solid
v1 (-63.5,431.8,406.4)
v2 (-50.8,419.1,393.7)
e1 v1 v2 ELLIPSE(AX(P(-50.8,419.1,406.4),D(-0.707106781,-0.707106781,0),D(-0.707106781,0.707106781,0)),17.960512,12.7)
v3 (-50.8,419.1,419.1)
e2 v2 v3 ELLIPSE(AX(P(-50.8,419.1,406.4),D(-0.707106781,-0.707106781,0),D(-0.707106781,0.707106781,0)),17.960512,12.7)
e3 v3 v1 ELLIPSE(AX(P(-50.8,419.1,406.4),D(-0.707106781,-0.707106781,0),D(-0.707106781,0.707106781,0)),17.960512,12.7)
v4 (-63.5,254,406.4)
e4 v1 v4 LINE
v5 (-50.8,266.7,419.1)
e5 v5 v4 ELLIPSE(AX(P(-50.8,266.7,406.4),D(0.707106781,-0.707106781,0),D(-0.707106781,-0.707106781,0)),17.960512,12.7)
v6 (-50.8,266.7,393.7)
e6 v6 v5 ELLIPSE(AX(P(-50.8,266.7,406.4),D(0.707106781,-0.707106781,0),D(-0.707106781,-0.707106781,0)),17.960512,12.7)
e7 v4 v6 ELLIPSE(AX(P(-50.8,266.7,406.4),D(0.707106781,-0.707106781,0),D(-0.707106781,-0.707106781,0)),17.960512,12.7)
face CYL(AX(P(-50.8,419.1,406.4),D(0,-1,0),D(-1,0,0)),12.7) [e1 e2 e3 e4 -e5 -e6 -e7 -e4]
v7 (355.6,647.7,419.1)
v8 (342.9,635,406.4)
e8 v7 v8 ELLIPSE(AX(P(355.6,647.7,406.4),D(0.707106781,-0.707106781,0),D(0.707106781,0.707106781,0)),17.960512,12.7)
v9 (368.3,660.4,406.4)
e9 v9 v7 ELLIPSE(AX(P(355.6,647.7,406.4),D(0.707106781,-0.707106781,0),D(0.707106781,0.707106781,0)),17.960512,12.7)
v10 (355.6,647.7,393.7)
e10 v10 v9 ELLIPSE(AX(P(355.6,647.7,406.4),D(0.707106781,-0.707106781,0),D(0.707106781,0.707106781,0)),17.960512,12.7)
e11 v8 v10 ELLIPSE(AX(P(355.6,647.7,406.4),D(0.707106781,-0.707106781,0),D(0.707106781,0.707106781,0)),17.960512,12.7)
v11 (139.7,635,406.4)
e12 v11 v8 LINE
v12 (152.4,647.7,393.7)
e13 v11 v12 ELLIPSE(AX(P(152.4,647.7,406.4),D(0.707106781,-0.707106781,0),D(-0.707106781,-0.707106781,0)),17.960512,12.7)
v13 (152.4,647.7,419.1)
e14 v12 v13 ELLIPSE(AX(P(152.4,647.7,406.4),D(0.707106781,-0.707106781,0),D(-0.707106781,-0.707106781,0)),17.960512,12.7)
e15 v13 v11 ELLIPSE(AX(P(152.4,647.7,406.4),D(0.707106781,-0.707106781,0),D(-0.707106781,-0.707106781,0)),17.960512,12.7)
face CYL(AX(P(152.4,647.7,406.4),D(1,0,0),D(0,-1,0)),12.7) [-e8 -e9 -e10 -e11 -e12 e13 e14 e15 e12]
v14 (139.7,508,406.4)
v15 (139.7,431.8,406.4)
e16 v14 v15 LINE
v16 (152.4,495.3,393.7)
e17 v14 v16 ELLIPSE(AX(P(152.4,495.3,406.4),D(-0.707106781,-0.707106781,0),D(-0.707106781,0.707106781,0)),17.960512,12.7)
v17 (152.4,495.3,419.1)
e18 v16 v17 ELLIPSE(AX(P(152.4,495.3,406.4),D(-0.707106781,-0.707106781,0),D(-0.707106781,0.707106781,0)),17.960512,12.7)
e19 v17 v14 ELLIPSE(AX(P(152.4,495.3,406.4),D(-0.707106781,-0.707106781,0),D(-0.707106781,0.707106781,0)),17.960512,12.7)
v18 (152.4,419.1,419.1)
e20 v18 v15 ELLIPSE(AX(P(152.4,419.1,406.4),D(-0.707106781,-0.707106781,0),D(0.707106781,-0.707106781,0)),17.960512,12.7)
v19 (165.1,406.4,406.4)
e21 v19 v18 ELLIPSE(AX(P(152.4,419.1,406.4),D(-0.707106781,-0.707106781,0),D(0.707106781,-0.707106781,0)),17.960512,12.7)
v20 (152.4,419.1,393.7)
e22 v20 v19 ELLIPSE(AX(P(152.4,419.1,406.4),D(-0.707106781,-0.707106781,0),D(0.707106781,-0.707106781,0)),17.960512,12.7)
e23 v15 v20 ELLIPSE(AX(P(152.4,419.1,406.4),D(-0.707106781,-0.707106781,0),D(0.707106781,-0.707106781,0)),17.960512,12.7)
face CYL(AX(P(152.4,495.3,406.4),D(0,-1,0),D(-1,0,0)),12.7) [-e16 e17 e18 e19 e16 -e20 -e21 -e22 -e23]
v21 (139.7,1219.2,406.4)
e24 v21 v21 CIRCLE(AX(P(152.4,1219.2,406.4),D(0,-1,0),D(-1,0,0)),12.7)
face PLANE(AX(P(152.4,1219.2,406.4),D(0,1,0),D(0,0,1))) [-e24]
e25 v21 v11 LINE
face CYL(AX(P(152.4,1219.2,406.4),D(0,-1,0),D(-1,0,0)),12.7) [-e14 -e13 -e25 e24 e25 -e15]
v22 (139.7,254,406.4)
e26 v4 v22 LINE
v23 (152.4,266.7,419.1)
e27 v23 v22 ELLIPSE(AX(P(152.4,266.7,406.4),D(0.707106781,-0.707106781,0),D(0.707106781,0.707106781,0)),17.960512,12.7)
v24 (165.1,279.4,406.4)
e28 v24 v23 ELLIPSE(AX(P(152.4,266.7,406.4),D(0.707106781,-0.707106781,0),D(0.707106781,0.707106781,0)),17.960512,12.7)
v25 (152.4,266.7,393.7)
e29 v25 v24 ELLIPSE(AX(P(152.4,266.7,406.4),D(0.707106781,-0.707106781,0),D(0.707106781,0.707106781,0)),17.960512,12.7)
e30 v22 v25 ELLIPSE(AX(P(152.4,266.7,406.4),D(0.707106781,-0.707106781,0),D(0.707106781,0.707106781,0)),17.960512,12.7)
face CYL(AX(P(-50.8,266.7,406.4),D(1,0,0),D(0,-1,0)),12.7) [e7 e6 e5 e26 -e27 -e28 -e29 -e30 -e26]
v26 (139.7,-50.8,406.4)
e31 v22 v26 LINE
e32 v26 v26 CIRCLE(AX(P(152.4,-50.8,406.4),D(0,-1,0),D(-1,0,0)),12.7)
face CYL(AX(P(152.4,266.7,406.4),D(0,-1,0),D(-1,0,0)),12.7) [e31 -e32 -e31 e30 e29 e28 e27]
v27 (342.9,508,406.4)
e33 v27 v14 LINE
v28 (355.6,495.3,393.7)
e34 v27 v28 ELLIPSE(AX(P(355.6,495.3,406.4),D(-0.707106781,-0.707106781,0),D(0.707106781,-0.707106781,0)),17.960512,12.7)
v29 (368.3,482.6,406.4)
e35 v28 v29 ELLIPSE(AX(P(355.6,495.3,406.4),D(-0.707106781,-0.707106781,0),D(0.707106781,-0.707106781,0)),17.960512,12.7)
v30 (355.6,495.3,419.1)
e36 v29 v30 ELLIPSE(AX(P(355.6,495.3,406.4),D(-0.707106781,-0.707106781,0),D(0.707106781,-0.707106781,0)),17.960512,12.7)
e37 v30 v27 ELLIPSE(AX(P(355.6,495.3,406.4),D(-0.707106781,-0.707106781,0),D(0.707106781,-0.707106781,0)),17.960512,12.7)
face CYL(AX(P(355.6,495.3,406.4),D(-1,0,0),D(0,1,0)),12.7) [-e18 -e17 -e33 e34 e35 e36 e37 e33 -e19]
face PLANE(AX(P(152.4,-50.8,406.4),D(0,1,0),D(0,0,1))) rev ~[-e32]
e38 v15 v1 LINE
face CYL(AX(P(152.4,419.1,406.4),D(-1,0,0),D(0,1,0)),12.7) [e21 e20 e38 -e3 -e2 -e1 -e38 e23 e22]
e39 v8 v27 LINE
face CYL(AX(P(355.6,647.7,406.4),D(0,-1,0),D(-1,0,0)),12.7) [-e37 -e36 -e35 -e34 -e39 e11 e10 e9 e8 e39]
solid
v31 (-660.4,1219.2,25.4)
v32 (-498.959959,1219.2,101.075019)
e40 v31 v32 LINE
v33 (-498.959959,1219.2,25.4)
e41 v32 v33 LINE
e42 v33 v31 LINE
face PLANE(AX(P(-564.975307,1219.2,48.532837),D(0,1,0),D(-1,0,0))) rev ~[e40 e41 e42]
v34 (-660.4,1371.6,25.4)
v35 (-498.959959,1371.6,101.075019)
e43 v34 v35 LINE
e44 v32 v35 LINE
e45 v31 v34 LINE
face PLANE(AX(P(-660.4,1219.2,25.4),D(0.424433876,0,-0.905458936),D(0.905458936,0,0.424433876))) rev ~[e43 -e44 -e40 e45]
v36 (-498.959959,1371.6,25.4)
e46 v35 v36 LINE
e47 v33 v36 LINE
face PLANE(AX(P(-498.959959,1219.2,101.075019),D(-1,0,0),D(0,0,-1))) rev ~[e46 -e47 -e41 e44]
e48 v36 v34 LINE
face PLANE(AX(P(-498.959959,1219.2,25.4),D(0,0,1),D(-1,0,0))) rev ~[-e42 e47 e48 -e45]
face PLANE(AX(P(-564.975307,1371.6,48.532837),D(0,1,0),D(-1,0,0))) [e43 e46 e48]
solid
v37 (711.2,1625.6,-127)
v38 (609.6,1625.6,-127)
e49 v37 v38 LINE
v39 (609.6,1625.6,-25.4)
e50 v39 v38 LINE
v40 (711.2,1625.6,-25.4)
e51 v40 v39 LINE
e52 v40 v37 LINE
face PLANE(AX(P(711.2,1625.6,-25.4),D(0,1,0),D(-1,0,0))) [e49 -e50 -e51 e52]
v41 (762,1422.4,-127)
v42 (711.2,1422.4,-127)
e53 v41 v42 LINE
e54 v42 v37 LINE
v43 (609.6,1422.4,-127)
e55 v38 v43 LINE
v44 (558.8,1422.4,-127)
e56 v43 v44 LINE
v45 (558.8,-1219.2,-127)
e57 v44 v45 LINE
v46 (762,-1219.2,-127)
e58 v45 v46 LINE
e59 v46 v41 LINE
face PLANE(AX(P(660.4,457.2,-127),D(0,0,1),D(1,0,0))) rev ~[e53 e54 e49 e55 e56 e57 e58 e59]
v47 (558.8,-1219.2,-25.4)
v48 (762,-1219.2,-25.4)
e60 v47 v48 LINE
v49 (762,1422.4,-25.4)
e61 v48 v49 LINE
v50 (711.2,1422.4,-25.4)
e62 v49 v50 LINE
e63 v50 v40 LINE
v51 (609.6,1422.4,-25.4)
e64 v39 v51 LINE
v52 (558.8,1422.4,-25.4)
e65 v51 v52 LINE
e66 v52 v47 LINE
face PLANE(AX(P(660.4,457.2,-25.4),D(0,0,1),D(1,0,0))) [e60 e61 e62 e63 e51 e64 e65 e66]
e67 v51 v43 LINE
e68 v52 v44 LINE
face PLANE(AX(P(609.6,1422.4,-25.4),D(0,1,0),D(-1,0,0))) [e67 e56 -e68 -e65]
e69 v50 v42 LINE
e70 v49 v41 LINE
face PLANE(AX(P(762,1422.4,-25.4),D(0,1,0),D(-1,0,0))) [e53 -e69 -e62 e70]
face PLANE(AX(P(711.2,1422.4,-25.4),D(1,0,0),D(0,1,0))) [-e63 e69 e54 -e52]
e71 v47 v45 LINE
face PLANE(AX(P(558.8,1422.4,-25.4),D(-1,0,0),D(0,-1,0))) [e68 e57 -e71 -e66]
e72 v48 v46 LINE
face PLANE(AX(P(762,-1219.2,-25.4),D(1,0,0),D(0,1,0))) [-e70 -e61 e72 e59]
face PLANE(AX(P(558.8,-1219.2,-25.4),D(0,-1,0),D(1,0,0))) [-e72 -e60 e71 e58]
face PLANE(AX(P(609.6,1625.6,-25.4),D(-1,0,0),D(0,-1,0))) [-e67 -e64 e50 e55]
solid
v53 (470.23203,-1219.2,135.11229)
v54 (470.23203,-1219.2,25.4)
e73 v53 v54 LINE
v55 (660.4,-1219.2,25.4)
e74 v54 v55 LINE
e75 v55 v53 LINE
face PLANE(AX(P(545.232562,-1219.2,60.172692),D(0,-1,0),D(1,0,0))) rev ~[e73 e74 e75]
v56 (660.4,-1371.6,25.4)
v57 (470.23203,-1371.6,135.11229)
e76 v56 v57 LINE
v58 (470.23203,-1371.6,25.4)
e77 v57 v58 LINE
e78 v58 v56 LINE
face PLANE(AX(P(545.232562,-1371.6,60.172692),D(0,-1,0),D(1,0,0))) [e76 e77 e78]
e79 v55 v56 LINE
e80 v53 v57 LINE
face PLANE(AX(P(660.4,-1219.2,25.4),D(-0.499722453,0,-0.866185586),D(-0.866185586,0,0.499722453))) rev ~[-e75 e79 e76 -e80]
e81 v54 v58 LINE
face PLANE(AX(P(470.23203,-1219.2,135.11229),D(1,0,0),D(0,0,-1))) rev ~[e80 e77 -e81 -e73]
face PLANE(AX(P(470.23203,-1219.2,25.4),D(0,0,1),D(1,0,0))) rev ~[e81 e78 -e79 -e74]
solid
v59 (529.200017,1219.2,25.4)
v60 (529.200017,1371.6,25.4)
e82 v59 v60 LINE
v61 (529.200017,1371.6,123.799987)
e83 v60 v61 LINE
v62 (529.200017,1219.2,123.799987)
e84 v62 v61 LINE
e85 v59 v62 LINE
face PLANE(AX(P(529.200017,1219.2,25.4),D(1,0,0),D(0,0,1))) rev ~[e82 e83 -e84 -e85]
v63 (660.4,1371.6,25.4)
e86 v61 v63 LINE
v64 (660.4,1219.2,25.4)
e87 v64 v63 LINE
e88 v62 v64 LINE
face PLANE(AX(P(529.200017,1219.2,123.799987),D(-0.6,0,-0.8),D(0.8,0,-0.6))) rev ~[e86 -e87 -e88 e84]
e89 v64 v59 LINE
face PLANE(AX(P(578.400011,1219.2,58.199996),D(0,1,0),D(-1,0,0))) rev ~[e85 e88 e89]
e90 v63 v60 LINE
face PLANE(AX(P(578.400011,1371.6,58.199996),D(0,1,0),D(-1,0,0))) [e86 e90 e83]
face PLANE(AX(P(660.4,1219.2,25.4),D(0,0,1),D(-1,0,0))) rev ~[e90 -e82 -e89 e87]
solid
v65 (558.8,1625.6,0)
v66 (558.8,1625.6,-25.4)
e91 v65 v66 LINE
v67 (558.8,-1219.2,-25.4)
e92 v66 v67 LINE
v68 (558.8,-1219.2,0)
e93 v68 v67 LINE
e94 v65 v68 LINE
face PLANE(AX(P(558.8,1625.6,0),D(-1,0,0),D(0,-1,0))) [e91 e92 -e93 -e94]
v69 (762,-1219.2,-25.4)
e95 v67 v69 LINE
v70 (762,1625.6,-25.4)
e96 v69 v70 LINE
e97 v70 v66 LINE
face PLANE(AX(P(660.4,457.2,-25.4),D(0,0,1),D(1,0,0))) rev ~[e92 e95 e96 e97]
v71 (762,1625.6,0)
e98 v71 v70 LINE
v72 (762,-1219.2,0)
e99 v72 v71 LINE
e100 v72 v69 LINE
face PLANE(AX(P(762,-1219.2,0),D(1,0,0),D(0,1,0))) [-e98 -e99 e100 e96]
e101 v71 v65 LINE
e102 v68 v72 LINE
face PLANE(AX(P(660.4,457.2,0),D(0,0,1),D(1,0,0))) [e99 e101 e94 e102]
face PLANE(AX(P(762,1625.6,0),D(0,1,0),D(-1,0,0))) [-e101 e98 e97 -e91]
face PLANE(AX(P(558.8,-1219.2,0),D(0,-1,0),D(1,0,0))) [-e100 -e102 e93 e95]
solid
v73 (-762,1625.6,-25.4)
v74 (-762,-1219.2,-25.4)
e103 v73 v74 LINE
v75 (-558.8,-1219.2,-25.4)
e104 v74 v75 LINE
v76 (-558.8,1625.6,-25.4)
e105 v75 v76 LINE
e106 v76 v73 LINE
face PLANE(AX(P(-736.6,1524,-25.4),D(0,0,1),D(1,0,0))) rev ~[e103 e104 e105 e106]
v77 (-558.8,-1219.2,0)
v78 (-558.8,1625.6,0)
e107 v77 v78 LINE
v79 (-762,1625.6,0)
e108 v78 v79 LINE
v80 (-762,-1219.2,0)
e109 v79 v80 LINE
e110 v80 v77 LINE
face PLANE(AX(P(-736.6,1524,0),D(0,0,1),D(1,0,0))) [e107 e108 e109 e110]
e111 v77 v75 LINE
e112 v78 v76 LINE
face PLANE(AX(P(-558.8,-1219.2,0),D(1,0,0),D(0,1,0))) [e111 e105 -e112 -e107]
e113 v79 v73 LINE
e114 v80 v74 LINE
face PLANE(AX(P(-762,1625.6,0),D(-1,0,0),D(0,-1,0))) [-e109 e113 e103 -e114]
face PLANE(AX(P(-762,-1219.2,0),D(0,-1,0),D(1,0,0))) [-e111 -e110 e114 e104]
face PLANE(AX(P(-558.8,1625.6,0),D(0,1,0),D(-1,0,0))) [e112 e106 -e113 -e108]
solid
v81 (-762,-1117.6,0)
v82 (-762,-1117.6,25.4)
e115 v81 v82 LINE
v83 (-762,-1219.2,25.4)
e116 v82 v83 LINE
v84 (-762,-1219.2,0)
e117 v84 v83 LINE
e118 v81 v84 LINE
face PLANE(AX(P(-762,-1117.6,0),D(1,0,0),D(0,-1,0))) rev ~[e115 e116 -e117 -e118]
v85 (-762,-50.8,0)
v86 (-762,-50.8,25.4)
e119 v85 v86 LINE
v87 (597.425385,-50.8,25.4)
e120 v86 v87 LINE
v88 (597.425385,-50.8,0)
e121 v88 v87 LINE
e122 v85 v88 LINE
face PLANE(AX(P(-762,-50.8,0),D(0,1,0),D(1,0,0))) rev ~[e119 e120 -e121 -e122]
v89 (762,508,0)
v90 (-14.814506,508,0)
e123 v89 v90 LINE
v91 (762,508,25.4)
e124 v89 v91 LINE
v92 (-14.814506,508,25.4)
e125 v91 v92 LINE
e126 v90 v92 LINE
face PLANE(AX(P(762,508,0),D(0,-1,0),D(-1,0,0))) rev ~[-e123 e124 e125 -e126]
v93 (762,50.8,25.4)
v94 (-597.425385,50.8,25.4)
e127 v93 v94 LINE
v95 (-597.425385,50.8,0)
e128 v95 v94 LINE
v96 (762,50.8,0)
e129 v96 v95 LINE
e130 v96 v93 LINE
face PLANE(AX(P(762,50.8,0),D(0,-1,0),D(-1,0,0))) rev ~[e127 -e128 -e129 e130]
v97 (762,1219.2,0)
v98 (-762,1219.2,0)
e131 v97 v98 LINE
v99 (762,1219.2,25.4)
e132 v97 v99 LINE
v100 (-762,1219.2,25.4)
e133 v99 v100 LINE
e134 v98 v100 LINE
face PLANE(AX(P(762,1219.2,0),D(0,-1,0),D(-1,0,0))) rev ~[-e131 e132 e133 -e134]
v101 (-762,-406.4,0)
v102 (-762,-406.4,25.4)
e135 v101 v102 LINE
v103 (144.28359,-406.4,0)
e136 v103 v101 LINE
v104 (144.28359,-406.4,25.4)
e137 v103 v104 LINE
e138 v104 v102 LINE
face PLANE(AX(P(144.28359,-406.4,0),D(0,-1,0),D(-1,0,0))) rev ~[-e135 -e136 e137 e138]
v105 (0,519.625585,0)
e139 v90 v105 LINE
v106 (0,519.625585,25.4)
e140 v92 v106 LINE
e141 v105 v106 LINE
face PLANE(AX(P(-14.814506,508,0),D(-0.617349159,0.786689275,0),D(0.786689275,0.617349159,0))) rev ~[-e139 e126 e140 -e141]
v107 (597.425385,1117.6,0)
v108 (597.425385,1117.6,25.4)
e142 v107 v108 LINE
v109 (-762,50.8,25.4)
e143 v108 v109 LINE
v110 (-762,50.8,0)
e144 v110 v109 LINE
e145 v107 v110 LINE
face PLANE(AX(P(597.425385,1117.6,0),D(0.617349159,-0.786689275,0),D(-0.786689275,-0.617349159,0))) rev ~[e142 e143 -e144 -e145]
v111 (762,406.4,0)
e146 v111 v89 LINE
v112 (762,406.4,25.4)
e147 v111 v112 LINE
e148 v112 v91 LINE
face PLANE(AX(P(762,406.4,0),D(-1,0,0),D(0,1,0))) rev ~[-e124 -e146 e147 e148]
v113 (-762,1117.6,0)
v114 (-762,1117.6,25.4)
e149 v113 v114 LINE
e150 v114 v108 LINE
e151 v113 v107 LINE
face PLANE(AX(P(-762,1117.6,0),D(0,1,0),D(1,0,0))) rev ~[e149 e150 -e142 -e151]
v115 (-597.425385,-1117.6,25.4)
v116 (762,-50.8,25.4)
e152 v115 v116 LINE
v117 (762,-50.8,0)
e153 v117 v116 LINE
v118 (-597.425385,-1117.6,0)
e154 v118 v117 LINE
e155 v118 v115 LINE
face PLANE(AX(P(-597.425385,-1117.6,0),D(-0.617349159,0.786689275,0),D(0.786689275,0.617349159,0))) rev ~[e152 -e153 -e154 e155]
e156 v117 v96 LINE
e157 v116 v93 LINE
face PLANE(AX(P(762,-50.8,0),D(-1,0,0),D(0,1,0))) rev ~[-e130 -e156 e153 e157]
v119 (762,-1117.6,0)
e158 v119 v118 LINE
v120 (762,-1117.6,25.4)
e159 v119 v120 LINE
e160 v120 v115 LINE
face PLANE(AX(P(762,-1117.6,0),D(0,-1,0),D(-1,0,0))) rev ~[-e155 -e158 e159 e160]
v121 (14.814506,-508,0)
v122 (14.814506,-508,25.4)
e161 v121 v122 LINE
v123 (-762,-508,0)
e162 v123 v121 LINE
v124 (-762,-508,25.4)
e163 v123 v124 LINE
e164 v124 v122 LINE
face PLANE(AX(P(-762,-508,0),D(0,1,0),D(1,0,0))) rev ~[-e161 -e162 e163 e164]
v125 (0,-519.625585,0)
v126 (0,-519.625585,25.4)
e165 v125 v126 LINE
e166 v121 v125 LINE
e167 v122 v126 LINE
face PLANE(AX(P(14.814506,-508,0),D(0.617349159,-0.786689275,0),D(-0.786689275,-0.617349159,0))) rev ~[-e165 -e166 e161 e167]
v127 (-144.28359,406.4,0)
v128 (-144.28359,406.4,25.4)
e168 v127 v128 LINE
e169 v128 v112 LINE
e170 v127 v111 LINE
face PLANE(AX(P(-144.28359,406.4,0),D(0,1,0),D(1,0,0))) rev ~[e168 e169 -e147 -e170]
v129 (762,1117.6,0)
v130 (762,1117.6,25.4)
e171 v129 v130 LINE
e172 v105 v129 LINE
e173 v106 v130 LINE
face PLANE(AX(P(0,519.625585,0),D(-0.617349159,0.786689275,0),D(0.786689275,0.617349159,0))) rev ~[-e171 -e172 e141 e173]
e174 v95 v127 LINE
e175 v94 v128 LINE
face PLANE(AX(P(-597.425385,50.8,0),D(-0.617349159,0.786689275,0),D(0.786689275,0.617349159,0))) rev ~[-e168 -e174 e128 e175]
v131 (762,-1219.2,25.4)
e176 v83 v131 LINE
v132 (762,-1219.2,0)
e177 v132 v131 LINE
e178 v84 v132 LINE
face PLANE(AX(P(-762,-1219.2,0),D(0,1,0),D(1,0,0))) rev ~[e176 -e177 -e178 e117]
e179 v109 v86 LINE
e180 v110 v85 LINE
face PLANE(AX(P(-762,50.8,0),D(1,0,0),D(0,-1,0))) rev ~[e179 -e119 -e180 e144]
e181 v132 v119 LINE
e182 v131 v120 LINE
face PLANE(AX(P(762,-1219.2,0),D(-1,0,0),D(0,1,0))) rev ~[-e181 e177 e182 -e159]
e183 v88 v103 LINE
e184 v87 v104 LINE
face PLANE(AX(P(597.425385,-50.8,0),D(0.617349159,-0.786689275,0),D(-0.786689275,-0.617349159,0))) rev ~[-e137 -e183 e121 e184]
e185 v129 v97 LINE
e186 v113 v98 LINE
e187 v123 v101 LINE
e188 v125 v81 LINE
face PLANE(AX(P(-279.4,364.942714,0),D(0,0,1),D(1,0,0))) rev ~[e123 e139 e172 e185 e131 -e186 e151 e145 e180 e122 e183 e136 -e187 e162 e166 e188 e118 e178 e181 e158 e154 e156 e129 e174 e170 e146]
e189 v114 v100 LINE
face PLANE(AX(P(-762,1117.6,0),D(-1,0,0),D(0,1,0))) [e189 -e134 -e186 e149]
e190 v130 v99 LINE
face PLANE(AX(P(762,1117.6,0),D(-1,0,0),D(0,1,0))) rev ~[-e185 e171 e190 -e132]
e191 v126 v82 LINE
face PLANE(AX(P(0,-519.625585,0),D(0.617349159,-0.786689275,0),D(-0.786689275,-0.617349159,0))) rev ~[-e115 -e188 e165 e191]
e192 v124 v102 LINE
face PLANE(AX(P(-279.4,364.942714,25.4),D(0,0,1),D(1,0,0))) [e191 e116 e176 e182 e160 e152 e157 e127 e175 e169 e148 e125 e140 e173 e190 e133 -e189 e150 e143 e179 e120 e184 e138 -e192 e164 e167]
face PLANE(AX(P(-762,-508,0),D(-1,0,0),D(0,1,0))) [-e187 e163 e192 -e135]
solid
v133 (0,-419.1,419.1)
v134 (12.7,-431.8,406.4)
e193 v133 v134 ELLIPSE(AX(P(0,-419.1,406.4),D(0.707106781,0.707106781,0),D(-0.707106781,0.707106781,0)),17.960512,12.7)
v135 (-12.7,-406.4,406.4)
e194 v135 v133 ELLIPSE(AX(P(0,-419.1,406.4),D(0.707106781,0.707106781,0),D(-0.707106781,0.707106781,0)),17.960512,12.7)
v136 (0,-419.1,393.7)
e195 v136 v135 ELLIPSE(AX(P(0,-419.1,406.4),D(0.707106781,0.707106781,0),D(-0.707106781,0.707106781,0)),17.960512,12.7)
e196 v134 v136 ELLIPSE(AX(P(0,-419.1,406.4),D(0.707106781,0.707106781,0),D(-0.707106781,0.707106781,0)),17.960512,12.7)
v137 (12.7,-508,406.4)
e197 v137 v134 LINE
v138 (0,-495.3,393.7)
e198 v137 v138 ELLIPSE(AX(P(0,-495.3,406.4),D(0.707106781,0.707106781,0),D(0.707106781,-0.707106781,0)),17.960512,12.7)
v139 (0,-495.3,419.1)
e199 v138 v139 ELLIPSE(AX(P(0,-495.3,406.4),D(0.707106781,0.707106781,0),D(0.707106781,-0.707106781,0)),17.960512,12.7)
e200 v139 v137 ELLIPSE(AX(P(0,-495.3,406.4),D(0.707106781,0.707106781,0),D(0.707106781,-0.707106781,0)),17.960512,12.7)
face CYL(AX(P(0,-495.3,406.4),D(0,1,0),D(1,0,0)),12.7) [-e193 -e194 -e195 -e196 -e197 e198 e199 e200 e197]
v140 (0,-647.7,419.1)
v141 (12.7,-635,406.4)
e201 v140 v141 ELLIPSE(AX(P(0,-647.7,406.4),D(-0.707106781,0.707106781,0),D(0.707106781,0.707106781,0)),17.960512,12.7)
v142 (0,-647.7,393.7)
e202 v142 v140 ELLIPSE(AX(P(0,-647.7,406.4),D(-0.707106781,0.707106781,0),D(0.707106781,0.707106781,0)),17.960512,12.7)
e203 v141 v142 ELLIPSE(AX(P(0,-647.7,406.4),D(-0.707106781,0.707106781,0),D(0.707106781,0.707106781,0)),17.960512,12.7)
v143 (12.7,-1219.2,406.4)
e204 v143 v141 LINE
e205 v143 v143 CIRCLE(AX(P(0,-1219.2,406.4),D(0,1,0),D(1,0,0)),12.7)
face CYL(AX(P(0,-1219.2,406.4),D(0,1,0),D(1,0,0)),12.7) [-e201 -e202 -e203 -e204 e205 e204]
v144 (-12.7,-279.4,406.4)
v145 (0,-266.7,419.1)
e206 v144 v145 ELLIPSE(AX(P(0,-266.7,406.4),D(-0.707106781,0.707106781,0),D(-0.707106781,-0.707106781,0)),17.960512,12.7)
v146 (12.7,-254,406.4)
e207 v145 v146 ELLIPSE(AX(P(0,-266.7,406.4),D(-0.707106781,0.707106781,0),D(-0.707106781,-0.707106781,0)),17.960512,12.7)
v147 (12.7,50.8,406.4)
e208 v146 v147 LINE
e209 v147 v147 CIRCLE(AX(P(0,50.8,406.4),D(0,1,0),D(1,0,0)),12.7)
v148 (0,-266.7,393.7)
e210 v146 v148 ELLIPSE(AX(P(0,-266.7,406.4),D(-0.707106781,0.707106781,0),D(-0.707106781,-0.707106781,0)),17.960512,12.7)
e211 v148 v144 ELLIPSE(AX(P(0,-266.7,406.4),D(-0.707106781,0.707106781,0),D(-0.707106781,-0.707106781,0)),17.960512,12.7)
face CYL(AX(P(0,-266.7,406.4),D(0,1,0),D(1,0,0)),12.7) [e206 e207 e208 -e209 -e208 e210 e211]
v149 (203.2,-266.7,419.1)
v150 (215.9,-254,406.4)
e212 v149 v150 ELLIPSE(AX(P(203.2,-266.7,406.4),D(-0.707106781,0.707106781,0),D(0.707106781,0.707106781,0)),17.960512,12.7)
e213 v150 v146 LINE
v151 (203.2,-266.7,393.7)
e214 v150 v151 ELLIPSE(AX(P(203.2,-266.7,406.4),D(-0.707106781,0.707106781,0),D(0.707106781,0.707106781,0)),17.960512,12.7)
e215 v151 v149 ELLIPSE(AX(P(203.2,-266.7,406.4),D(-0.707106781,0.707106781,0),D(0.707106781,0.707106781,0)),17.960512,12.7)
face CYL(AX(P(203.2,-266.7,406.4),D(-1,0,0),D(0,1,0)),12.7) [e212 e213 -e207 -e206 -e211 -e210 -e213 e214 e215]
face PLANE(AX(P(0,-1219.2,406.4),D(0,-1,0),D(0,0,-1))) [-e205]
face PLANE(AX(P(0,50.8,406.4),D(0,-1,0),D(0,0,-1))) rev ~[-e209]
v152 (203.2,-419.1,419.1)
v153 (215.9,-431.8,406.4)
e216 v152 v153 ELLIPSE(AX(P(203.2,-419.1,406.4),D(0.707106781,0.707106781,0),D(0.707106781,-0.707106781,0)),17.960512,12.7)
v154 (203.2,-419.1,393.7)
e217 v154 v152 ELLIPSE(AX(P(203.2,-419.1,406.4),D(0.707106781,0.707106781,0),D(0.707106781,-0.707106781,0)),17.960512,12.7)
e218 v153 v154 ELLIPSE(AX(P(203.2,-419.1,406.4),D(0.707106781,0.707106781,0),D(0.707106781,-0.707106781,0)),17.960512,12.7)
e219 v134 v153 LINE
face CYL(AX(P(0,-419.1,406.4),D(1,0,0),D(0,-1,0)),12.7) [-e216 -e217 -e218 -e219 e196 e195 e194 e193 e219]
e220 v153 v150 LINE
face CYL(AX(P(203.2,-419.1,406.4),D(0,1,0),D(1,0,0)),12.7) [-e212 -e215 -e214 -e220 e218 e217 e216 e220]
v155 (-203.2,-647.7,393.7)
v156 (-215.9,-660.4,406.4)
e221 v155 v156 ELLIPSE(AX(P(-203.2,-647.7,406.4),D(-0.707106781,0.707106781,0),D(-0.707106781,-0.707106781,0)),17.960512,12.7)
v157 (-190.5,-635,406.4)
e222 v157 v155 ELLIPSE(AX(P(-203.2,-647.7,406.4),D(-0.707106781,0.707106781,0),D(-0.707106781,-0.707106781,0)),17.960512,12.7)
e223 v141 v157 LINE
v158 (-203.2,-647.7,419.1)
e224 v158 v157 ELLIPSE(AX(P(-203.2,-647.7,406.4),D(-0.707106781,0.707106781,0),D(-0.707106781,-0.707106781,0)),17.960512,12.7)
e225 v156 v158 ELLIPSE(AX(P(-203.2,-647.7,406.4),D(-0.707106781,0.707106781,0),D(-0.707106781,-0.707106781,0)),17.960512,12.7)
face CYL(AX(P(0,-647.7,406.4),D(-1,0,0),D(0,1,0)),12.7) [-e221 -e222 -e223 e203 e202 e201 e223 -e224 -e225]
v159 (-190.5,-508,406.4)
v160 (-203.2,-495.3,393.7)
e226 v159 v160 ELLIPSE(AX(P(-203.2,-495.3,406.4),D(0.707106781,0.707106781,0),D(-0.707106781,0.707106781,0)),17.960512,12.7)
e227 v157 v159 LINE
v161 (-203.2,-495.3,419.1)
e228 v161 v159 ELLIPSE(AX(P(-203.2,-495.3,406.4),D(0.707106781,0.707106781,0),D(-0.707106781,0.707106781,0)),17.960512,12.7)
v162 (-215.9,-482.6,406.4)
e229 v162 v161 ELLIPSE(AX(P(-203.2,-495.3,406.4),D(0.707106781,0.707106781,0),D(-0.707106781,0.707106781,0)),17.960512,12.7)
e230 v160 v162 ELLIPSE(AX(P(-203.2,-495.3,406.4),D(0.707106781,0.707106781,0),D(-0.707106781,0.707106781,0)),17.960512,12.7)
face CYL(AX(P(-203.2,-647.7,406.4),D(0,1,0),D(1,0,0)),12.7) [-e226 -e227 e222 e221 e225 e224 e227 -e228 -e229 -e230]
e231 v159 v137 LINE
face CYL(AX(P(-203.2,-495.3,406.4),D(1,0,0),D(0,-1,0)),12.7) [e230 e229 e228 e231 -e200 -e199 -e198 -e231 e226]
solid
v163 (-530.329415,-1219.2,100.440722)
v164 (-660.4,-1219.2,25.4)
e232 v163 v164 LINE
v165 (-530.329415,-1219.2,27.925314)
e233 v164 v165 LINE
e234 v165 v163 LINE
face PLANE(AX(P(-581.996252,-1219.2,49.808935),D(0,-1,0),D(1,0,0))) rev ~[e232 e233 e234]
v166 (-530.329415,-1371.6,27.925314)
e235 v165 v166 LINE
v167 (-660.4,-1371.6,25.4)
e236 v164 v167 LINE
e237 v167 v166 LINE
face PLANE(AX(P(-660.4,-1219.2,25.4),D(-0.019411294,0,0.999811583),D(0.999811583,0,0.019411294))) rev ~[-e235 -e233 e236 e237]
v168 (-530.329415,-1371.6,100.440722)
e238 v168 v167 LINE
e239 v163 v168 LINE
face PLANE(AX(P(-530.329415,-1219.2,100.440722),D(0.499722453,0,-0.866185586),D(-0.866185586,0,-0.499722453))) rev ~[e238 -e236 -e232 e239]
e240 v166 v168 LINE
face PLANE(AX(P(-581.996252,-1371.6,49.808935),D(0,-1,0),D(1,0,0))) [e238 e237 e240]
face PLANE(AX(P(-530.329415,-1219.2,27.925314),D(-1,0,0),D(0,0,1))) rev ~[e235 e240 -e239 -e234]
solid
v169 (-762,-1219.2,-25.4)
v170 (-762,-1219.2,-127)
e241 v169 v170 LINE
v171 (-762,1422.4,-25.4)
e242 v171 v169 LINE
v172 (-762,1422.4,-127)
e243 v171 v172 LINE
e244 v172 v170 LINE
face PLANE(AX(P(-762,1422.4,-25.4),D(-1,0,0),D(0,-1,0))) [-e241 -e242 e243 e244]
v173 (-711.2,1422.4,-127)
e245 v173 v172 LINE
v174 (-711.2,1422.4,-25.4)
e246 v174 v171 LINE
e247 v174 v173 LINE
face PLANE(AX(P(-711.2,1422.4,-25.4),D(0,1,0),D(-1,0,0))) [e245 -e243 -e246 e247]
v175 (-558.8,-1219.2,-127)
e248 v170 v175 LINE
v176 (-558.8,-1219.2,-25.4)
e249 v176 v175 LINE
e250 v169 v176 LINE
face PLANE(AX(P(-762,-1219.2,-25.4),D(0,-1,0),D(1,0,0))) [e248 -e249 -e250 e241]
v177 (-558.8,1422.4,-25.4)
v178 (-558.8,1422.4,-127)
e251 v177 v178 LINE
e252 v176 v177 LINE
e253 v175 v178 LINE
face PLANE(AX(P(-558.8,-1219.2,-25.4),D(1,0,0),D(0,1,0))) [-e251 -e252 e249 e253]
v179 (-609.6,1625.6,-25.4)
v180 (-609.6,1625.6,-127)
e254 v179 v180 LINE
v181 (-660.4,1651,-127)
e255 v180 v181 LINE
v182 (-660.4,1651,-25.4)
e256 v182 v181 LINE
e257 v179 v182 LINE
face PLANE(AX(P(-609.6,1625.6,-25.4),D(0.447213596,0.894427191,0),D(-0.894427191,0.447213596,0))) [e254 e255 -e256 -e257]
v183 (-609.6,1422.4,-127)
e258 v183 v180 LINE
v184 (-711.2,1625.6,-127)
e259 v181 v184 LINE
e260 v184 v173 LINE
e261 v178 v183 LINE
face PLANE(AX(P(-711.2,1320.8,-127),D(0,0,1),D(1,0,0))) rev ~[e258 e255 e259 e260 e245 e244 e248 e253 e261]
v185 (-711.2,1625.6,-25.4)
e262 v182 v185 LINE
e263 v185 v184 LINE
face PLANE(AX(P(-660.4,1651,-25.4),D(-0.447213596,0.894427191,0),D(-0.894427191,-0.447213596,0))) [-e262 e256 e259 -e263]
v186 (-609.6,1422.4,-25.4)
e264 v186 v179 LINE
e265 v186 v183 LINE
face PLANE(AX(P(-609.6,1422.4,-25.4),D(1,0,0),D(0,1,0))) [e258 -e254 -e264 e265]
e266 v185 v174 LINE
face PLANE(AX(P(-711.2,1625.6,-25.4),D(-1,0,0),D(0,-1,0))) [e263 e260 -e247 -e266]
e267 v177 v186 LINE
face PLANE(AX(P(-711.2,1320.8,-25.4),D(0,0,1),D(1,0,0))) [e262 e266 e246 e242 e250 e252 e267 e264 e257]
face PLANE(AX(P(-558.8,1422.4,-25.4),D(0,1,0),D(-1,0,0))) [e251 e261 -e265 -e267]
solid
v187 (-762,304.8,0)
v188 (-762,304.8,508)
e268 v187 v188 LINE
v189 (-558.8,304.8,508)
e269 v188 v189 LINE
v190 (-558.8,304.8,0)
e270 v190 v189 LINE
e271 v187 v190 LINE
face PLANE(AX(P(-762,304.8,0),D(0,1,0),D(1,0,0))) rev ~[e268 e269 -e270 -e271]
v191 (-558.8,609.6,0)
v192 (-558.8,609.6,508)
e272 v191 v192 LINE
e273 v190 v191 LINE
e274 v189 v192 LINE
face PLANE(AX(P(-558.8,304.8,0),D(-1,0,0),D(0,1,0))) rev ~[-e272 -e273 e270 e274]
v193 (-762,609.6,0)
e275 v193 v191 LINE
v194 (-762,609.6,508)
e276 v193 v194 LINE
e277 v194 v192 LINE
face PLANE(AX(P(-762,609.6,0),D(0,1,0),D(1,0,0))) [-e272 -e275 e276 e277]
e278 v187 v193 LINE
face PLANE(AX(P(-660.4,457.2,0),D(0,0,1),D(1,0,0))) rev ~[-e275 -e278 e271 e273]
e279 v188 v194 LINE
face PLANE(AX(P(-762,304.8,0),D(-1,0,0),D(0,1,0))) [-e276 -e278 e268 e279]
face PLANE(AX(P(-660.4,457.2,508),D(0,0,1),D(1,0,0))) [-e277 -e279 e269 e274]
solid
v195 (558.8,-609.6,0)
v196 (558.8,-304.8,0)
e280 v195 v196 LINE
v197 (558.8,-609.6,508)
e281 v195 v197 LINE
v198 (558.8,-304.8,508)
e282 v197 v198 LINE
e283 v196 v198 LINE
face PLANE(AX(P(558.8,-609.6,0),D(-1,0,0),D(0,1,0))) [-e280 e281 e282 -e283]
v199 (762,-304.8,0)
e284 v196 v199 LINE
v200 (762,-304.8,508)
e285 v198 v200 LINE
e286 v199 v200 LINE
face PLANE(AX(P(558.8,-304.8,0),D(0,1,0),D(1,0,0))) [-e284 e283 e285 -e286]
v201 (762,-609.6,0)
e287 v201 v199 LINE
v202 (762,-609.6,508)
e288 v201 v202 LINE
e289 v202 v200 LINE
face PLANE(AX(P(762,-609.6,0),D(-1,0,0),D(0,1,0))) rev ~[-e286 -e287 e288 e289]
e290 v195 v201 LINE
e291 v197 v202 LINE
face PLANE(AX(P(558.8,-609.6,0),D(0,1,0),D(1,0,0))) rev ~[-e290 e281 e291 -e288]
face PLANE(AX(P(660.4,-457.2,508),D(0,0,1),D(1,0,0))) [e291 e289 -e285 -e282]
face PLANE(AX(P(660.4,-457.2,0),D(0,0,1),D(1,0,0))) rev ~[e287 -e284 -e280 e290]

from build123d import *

# Parameters (mm, degrees)
F2_START  = -25.4
F1_W      = 203.2
F1_H      = 304.8
F1_H_2    = 1524
F2_DEPTH  = 101.6
F1_H_3    = 609.6
F3_DEPTH  = 508
F4_DEPTH  = 508
F1_W_2    = 50.8
F1_H_4    = 203.2
F6_DEPTH  = 25.4
F7_W      = 558.8
F7_H      = 101.6
F7_W_2    = 203.2
F8_DEPTH  = 25.4
F11_R     = 12.7
F13_R     = 12.7
F15_DEPTH = 152.4
F16_DEPTH = 152.4


with BuildPart() as f2:
    # F1 (on Top) → F2 (new body)
    with BuildSketch(Plane.XY.offset(F2_START)):
        Polygon((-762, 1422.4), (-762, 1219.2), (-660.4, 1219.2), (-660.4, 1422.4), (-711.2, 1422.4), align=None)
        Polygon((-660.4, 1219.2), (-762, 1219.2), (-762, 609.6), (-558.8, 609.6), (-558.8, 1219.2), align=None)
        Polygon((-660.4, 1422.4), (-660.4, 1219.2), (-558.8, 1219.2), (-558.8, 1422.4), (-609.6, 1422.4), align=None)
        with Locations((-660.4, 457.2)):
            Rectangle(F1_W, F1_H)
        Polygon((-711.2, 1422.4), (-660.4, 1422.4), (-609.6, 1422.4), (-609.6, 1625.6), (-711.2, 1625.6), align=None)
        with Locations((-660.4, -457.2)):
            Rectangle(F1_W, F1_H_2)
        Polygon((-660.4, 1651), (-711.2, 1625.6), (-609.6, 1625.6), align=None)
    extrude(amount=-F2_DEPTH)


with BuildPart() as f2b:
    # F1 (on Top) → F2, piece 2 (new body)
    with BuildSketch(Plane.XY.offset(F2_START)):
        Polygon((660.4, 1219.2), (558.8, 1219.2), (558.8, -304.8), (762, -304.8), (762, 1219.2), align=None)
        Polygon((558.8, 1422.4), (558.8, 1219.2), (660.4, 1219.2), (660.4, 1422.4), (609.6, 1422.4), align=None)
        with Locations((660.4, -457.2)):
            Rectangle(F1_W, F1_H)
        Polygon((660.4, 1422.4), (660.4, 1219.2), (762, 1219.2), (762, 1422.4), (711.2, 1422.4), align=None)
        with Locations((660.4, -914.4)):
            Rectangle(F1_W, F1_H_3)
        Polygon((609.6, 1422.4), (660.4, 1422.4), (711.2, 1422.4), (711.2, 1625.6), (609.6, 1625.6), align=None)
    extrude(amount=-F2_DEPTH)


with BuildPart() as f3:
    # F1 (on Top) → F3 (new body)
    with BuildSketch(Plane.XY):
        with Locations((-660.4, 457.2)):
            Rectangle(F1_W, F1_H)
    extrude(amount=F3_DEPTH)


with BuildPart() as f4:
    # F1 (on Top) → F4 (new body)
    with BuildSketch(Plane.XY):
        with Locations((660.4, -457.2)):
            Rectangle(F1_W, F1_H)
    extrude(amount=F4_DEPTH)


with BuildPart() as f6:
    # F1 (on Top) → F6 (new body)
    with BuildSketch(Plane.XY):
        with Locations((-736.6, 1524)):
            Rectangle(F1_W_2, F1_H_4)
        Polygon((-711.2, 1422.4), (-660.4, 1422.4), (-609.6, 1422.4), (-609.6, 1625.6), (-711.2, 1625.6), align=None)
        with Locations((-584.2, 1524)):
            Rectangle(F1_W_2, F1_H_4)
        Polygon((-660.4, 1422.4), (-660.4, 1219.2), (-558.8, 1219.2), (-558.8, 1422.4), (-609.6, 1422.4), align=None)
        Polygon((-762, 1422.4), (-762, 1219.2), (-660.4, 1219.2), (-660.4, 1422.4), (-711.2, 1422.4), align=None)
        Polygon((-660.4, 1219.2), (-762, 1219.2), (-762, 609.6), (-558.8, 609.6), (-558.8, 1219.2), align=None)
        with Locations((-660.4, -457.2)):
            Rectangle(F1_W, F1_H_2)
        with Locations((-660.4, 457.2)):
            Rectangle(F1_W, F1_H)
    extrude(amount=-F6_DEPTH)


with BuildPart() as f6b:
    # F1 (on Top) → F6, piece 2 (new body)
    with BuildSketch(Plane.XY):
        Polygon((660.4, 1219.2), (558.8, 1219.2), (558.8, -304.8), (762, -304.8), (762, 1219.2), align=None)
        with Locations((660.4, -914.4)):
            Rectangle(F1_W, F1_H_3)
        with Locations((584.2, 1524)):
            Rectangle(F1_W_2, F1_H_4)
        Polygon((609.6, 1422.4), (660.4, 1422.4), (711.2, 1422.4), (711.2, 1625.6), (609.6, 1625.6), align=None)
        with Locations((736.6, 1524)):
            Rectangle(F1_W_2, F1_H_4)
        Polygon((660.4, 1422.4), (660.4, 1219.2), (762, 1219.2), (762, 1422.4), (711.2, 1422.4), align=None)
        Polygon((558.8, 1422.4), (558.8, 1219.2), (660.4, 1219.2), (660.4, 1422.4), (609.6, 1422.4), align=None)
        with Locations((660.4, -457.2)):
            Rectangle(F1_W, F1_H)
    extrude(amount=-F6_DEPTH)


with BuildPart() as f8:
    # F7 (on Top) → F8 (new body)
    with BuildSketch(Plane.XY):
        Polygon((0, 648.7744153468), (-558.8, 210.2598440925), (-558.8, 81.111013399), (-144.2835902197, 406.4), (-14.8145059026, 508), (0, 519.6255846532), align=None)
        Polygon((-558.8, 210.2598440925), (-762, 50.8), (-597.4253853296, 50.8), (-558.8, 81.111013399), align=None)
        Polygon((558.8, 1087.288986601), (0, 648.7744153468), (0, 519.6255846532), (558.8, 958.1401559075), align=None)
        Polygon((597.4253853296, 1117.6), (558.8, 1087.288986601), (558.8, 958.1401559075), (762, 1117.6), align=None)
        Polygon((762, 1219.2), (558.8, 1219.2), (558.8, 1117.6), (597.4253853296, 1117.6), (762, 1117.6), align=None)
        with Locations((279.4, 1168.4)):
            Rectangle(F7_W, F7_H)
        with Locations((-279.4, 1168.4)):
            Rectangle(F7_W, F7_H)
        with Locations((-660.4, 1168.4)):
            Rectangle(F7_W_2, F7_H)
        with Locations((-279.4, 0)):
            Rectangle(F7_W, F7_H)
        Polygon((-597.4253853296, 50.8), (-762, 50.8), (-762, -50.8), (-558.8, -50.8), (-558.8, 50.8), align=None)
        with Locations((279.4, 0)):
            Rectangle(F7_W, F7_H)
        Polygon((558.8, 50.8), (558.8, -50.8), (597.4253853296, -50.8), (762, -50.8), (762, 50.8), align=None)
        Polygon((558.8, -81.111013399), (144.2835902197, -406.4), (14.8145059026, -508), (0, -519.6255846533), (0, -648.7744153467), (558.8, -210.2598440925), align=None)
        Polygon((597.4253853296, -50.8), (558.8, -81.111013399), (558.8, -210.2598440925), (762, -50.8), align=None)
        Polygon((0, -519.6255846533), (-558.8, -958.1401559075), (-558.8, -1087.288986601), (0, -648.7744153467), align=None)
        Polygon((-558.8, -958.1401559075), (-762, -1117.6), (-597.4253853296, -1117.6), (-558.8, -1087.288986601), align=None)
        with Locations((-279.4, -1168.4)):
            Rectangle(F7_W, F7_H)
        Polygon((-597.4253853296, -1117.6), (-762, -1117.6), (-762, -1219.2), (-558.8, -1219.2), (-558.8, -1117.6), align=None)
        with Locations((279.4, -1168.4)):
            Rectangle(F7_W, F7_H)
        with Locations((660.4, -1168.4)):
            Rectangle(F7_W_2, F7_H)
        with Locations((-279.4, -457.2)):
            Rectangle(F7_W, F7_H)
        with Locations((-660.4, -457.2)):
            Rectangle(F7_W_2, F7_H)
        Polygon((144.2835902197, -406.4), (0, -406.4), (0, -508), (14.8145059026, -508), align=None)
        Polygon((-14.8145059026, 508), (-144.2835902197, 406.4), (0, 406.4), (0, 508), align=None)
        with Locations((660.4, 457.2)):
            Rectangle(F7_W_2, F7_H)
        with Locations((279.4, 457.2)):
            Rectangle(F7_W, F7_H)
    extrude(amount=F8_DEPTH)


with BuildPart() as f12:
    # F12: sweep along a path in F5
    with BuildLine(Plane.XY.offset(406.4)) as f12_path:
        Line((152.4, 1219.2), (152.4, 647.7))
        Line((152.4, 647.7), (355.6, 647.7))
        Line((355.6, 647.7), (355.6, 495.3))
        Line((355.6, 495.3), (152.4, 495.3))
        Line((152.4, 495.3), (152.4, 419.1))
        Line((152.4, 419.1), (-50.8, 419.1))
        Line((-50.8, 419.1), (-50.8, 266.7))
        Line((-50.8, 266.7), (152.4, 266.7))
        Line((152.4, 266.7), (152.4, -50.8))
    # F11 (on offset) → F12 (sweep)
    with BuildSketch(Plane(origin=(0, 1219.2, 0), x_dir=(-1, 0, 0), z_dir=(0, 1, 0))):
        with Locations((-152.4, 406.4)):
            Circle(F11_R)
    sweep(path=f12_path.line, transition=Transition.RIGHT)


with BuildPart() as f14:
    # F14: sweep along a path in F5
    with BuildLine(Plane.XY.offset(406.4)) as f14_path:
        Line((0, -1219.2), (0, -647.7))
        Line((0, -647.7), (-203.2, -647.7))
        Line((-203.2, -647.7), (-203.2, -495.3))
        Line((-203.2, -495.3), (0, -495.3))
        Line((0, -495.3), (0, -419.1))
        Line((0, -419.1), (203.2, -419.1))
        Line((203.2, -419.1), (203.2, -266.7))
        Line((203.2, -266.7), (0, -266.7))
        Line((0, -266.7), (0, 50.8))
    # F13 (on offset) → F14 (sweep)
    with BuildSketch(Plane.XZ.offset(1219.2)):
        with Locations((0, 406.4)):
            Circle(F13_R)
    sweep(path=f14_path.line, transition=Transition.RIGHT)


with BuildPart() as f15:
    # F13 (on offset) → F15 (new body)
    with BuildSketch(Plane.XZ.offset(1219.2)):
        Polygon((-530.3294147081, 27.9253141867), (-530.3294147081, 100.4407222838), (-660.4, 25.4), align=None)
    extrude(amount=F15_DEPTH)


with BuildPart() as f15b:
    # F13 (on offset) → F15, piece 2 (new body)
    with BuildSketch(Plane.XZ.offset(1219.2)):
        Polygon((660.4, 25.4), (470.2320303052, 135.1122902086), (470.2320303052, 25.4), align=None)
    extrude(amount=F15_DEPTH)


with BuildPart() as f16:
    # F11 (on offset) → F16 (new body)
    with BuildSketch(Plane(origin=(0, 1219.2, 0), x_dir=(-1, 0, 0), z_dir=(0, 1, 0))):
        Polygon((-529.2000174522, 123.7999869108), (-660.4, 25.4), (-529.2000174522, 25.4), align=None)
    extrude(amount=F16_DEPTH)


with BuildPart() as f16b:
    # F11 (on offset) → F16, piece 2 (new body)
    with BuildSketch(Plane(origin=(0, 1219.2, 0), x_dir=(-1, 0, 0), z_dir=(0, 1, 0))):
        Polygon((498.9599585533, 25.4), (660.4, 25.4), (498.9599585533, 101.0750194281), align=None)
    extrude(amount=F16_DEPTH)


solid = Compound([f2.part, f2b.part, f3.part, f4.part, f6.part, f6b.part, f8.part, f12.part, f14.part, f15.part, f15b.part, f16.part, f16b.part])
